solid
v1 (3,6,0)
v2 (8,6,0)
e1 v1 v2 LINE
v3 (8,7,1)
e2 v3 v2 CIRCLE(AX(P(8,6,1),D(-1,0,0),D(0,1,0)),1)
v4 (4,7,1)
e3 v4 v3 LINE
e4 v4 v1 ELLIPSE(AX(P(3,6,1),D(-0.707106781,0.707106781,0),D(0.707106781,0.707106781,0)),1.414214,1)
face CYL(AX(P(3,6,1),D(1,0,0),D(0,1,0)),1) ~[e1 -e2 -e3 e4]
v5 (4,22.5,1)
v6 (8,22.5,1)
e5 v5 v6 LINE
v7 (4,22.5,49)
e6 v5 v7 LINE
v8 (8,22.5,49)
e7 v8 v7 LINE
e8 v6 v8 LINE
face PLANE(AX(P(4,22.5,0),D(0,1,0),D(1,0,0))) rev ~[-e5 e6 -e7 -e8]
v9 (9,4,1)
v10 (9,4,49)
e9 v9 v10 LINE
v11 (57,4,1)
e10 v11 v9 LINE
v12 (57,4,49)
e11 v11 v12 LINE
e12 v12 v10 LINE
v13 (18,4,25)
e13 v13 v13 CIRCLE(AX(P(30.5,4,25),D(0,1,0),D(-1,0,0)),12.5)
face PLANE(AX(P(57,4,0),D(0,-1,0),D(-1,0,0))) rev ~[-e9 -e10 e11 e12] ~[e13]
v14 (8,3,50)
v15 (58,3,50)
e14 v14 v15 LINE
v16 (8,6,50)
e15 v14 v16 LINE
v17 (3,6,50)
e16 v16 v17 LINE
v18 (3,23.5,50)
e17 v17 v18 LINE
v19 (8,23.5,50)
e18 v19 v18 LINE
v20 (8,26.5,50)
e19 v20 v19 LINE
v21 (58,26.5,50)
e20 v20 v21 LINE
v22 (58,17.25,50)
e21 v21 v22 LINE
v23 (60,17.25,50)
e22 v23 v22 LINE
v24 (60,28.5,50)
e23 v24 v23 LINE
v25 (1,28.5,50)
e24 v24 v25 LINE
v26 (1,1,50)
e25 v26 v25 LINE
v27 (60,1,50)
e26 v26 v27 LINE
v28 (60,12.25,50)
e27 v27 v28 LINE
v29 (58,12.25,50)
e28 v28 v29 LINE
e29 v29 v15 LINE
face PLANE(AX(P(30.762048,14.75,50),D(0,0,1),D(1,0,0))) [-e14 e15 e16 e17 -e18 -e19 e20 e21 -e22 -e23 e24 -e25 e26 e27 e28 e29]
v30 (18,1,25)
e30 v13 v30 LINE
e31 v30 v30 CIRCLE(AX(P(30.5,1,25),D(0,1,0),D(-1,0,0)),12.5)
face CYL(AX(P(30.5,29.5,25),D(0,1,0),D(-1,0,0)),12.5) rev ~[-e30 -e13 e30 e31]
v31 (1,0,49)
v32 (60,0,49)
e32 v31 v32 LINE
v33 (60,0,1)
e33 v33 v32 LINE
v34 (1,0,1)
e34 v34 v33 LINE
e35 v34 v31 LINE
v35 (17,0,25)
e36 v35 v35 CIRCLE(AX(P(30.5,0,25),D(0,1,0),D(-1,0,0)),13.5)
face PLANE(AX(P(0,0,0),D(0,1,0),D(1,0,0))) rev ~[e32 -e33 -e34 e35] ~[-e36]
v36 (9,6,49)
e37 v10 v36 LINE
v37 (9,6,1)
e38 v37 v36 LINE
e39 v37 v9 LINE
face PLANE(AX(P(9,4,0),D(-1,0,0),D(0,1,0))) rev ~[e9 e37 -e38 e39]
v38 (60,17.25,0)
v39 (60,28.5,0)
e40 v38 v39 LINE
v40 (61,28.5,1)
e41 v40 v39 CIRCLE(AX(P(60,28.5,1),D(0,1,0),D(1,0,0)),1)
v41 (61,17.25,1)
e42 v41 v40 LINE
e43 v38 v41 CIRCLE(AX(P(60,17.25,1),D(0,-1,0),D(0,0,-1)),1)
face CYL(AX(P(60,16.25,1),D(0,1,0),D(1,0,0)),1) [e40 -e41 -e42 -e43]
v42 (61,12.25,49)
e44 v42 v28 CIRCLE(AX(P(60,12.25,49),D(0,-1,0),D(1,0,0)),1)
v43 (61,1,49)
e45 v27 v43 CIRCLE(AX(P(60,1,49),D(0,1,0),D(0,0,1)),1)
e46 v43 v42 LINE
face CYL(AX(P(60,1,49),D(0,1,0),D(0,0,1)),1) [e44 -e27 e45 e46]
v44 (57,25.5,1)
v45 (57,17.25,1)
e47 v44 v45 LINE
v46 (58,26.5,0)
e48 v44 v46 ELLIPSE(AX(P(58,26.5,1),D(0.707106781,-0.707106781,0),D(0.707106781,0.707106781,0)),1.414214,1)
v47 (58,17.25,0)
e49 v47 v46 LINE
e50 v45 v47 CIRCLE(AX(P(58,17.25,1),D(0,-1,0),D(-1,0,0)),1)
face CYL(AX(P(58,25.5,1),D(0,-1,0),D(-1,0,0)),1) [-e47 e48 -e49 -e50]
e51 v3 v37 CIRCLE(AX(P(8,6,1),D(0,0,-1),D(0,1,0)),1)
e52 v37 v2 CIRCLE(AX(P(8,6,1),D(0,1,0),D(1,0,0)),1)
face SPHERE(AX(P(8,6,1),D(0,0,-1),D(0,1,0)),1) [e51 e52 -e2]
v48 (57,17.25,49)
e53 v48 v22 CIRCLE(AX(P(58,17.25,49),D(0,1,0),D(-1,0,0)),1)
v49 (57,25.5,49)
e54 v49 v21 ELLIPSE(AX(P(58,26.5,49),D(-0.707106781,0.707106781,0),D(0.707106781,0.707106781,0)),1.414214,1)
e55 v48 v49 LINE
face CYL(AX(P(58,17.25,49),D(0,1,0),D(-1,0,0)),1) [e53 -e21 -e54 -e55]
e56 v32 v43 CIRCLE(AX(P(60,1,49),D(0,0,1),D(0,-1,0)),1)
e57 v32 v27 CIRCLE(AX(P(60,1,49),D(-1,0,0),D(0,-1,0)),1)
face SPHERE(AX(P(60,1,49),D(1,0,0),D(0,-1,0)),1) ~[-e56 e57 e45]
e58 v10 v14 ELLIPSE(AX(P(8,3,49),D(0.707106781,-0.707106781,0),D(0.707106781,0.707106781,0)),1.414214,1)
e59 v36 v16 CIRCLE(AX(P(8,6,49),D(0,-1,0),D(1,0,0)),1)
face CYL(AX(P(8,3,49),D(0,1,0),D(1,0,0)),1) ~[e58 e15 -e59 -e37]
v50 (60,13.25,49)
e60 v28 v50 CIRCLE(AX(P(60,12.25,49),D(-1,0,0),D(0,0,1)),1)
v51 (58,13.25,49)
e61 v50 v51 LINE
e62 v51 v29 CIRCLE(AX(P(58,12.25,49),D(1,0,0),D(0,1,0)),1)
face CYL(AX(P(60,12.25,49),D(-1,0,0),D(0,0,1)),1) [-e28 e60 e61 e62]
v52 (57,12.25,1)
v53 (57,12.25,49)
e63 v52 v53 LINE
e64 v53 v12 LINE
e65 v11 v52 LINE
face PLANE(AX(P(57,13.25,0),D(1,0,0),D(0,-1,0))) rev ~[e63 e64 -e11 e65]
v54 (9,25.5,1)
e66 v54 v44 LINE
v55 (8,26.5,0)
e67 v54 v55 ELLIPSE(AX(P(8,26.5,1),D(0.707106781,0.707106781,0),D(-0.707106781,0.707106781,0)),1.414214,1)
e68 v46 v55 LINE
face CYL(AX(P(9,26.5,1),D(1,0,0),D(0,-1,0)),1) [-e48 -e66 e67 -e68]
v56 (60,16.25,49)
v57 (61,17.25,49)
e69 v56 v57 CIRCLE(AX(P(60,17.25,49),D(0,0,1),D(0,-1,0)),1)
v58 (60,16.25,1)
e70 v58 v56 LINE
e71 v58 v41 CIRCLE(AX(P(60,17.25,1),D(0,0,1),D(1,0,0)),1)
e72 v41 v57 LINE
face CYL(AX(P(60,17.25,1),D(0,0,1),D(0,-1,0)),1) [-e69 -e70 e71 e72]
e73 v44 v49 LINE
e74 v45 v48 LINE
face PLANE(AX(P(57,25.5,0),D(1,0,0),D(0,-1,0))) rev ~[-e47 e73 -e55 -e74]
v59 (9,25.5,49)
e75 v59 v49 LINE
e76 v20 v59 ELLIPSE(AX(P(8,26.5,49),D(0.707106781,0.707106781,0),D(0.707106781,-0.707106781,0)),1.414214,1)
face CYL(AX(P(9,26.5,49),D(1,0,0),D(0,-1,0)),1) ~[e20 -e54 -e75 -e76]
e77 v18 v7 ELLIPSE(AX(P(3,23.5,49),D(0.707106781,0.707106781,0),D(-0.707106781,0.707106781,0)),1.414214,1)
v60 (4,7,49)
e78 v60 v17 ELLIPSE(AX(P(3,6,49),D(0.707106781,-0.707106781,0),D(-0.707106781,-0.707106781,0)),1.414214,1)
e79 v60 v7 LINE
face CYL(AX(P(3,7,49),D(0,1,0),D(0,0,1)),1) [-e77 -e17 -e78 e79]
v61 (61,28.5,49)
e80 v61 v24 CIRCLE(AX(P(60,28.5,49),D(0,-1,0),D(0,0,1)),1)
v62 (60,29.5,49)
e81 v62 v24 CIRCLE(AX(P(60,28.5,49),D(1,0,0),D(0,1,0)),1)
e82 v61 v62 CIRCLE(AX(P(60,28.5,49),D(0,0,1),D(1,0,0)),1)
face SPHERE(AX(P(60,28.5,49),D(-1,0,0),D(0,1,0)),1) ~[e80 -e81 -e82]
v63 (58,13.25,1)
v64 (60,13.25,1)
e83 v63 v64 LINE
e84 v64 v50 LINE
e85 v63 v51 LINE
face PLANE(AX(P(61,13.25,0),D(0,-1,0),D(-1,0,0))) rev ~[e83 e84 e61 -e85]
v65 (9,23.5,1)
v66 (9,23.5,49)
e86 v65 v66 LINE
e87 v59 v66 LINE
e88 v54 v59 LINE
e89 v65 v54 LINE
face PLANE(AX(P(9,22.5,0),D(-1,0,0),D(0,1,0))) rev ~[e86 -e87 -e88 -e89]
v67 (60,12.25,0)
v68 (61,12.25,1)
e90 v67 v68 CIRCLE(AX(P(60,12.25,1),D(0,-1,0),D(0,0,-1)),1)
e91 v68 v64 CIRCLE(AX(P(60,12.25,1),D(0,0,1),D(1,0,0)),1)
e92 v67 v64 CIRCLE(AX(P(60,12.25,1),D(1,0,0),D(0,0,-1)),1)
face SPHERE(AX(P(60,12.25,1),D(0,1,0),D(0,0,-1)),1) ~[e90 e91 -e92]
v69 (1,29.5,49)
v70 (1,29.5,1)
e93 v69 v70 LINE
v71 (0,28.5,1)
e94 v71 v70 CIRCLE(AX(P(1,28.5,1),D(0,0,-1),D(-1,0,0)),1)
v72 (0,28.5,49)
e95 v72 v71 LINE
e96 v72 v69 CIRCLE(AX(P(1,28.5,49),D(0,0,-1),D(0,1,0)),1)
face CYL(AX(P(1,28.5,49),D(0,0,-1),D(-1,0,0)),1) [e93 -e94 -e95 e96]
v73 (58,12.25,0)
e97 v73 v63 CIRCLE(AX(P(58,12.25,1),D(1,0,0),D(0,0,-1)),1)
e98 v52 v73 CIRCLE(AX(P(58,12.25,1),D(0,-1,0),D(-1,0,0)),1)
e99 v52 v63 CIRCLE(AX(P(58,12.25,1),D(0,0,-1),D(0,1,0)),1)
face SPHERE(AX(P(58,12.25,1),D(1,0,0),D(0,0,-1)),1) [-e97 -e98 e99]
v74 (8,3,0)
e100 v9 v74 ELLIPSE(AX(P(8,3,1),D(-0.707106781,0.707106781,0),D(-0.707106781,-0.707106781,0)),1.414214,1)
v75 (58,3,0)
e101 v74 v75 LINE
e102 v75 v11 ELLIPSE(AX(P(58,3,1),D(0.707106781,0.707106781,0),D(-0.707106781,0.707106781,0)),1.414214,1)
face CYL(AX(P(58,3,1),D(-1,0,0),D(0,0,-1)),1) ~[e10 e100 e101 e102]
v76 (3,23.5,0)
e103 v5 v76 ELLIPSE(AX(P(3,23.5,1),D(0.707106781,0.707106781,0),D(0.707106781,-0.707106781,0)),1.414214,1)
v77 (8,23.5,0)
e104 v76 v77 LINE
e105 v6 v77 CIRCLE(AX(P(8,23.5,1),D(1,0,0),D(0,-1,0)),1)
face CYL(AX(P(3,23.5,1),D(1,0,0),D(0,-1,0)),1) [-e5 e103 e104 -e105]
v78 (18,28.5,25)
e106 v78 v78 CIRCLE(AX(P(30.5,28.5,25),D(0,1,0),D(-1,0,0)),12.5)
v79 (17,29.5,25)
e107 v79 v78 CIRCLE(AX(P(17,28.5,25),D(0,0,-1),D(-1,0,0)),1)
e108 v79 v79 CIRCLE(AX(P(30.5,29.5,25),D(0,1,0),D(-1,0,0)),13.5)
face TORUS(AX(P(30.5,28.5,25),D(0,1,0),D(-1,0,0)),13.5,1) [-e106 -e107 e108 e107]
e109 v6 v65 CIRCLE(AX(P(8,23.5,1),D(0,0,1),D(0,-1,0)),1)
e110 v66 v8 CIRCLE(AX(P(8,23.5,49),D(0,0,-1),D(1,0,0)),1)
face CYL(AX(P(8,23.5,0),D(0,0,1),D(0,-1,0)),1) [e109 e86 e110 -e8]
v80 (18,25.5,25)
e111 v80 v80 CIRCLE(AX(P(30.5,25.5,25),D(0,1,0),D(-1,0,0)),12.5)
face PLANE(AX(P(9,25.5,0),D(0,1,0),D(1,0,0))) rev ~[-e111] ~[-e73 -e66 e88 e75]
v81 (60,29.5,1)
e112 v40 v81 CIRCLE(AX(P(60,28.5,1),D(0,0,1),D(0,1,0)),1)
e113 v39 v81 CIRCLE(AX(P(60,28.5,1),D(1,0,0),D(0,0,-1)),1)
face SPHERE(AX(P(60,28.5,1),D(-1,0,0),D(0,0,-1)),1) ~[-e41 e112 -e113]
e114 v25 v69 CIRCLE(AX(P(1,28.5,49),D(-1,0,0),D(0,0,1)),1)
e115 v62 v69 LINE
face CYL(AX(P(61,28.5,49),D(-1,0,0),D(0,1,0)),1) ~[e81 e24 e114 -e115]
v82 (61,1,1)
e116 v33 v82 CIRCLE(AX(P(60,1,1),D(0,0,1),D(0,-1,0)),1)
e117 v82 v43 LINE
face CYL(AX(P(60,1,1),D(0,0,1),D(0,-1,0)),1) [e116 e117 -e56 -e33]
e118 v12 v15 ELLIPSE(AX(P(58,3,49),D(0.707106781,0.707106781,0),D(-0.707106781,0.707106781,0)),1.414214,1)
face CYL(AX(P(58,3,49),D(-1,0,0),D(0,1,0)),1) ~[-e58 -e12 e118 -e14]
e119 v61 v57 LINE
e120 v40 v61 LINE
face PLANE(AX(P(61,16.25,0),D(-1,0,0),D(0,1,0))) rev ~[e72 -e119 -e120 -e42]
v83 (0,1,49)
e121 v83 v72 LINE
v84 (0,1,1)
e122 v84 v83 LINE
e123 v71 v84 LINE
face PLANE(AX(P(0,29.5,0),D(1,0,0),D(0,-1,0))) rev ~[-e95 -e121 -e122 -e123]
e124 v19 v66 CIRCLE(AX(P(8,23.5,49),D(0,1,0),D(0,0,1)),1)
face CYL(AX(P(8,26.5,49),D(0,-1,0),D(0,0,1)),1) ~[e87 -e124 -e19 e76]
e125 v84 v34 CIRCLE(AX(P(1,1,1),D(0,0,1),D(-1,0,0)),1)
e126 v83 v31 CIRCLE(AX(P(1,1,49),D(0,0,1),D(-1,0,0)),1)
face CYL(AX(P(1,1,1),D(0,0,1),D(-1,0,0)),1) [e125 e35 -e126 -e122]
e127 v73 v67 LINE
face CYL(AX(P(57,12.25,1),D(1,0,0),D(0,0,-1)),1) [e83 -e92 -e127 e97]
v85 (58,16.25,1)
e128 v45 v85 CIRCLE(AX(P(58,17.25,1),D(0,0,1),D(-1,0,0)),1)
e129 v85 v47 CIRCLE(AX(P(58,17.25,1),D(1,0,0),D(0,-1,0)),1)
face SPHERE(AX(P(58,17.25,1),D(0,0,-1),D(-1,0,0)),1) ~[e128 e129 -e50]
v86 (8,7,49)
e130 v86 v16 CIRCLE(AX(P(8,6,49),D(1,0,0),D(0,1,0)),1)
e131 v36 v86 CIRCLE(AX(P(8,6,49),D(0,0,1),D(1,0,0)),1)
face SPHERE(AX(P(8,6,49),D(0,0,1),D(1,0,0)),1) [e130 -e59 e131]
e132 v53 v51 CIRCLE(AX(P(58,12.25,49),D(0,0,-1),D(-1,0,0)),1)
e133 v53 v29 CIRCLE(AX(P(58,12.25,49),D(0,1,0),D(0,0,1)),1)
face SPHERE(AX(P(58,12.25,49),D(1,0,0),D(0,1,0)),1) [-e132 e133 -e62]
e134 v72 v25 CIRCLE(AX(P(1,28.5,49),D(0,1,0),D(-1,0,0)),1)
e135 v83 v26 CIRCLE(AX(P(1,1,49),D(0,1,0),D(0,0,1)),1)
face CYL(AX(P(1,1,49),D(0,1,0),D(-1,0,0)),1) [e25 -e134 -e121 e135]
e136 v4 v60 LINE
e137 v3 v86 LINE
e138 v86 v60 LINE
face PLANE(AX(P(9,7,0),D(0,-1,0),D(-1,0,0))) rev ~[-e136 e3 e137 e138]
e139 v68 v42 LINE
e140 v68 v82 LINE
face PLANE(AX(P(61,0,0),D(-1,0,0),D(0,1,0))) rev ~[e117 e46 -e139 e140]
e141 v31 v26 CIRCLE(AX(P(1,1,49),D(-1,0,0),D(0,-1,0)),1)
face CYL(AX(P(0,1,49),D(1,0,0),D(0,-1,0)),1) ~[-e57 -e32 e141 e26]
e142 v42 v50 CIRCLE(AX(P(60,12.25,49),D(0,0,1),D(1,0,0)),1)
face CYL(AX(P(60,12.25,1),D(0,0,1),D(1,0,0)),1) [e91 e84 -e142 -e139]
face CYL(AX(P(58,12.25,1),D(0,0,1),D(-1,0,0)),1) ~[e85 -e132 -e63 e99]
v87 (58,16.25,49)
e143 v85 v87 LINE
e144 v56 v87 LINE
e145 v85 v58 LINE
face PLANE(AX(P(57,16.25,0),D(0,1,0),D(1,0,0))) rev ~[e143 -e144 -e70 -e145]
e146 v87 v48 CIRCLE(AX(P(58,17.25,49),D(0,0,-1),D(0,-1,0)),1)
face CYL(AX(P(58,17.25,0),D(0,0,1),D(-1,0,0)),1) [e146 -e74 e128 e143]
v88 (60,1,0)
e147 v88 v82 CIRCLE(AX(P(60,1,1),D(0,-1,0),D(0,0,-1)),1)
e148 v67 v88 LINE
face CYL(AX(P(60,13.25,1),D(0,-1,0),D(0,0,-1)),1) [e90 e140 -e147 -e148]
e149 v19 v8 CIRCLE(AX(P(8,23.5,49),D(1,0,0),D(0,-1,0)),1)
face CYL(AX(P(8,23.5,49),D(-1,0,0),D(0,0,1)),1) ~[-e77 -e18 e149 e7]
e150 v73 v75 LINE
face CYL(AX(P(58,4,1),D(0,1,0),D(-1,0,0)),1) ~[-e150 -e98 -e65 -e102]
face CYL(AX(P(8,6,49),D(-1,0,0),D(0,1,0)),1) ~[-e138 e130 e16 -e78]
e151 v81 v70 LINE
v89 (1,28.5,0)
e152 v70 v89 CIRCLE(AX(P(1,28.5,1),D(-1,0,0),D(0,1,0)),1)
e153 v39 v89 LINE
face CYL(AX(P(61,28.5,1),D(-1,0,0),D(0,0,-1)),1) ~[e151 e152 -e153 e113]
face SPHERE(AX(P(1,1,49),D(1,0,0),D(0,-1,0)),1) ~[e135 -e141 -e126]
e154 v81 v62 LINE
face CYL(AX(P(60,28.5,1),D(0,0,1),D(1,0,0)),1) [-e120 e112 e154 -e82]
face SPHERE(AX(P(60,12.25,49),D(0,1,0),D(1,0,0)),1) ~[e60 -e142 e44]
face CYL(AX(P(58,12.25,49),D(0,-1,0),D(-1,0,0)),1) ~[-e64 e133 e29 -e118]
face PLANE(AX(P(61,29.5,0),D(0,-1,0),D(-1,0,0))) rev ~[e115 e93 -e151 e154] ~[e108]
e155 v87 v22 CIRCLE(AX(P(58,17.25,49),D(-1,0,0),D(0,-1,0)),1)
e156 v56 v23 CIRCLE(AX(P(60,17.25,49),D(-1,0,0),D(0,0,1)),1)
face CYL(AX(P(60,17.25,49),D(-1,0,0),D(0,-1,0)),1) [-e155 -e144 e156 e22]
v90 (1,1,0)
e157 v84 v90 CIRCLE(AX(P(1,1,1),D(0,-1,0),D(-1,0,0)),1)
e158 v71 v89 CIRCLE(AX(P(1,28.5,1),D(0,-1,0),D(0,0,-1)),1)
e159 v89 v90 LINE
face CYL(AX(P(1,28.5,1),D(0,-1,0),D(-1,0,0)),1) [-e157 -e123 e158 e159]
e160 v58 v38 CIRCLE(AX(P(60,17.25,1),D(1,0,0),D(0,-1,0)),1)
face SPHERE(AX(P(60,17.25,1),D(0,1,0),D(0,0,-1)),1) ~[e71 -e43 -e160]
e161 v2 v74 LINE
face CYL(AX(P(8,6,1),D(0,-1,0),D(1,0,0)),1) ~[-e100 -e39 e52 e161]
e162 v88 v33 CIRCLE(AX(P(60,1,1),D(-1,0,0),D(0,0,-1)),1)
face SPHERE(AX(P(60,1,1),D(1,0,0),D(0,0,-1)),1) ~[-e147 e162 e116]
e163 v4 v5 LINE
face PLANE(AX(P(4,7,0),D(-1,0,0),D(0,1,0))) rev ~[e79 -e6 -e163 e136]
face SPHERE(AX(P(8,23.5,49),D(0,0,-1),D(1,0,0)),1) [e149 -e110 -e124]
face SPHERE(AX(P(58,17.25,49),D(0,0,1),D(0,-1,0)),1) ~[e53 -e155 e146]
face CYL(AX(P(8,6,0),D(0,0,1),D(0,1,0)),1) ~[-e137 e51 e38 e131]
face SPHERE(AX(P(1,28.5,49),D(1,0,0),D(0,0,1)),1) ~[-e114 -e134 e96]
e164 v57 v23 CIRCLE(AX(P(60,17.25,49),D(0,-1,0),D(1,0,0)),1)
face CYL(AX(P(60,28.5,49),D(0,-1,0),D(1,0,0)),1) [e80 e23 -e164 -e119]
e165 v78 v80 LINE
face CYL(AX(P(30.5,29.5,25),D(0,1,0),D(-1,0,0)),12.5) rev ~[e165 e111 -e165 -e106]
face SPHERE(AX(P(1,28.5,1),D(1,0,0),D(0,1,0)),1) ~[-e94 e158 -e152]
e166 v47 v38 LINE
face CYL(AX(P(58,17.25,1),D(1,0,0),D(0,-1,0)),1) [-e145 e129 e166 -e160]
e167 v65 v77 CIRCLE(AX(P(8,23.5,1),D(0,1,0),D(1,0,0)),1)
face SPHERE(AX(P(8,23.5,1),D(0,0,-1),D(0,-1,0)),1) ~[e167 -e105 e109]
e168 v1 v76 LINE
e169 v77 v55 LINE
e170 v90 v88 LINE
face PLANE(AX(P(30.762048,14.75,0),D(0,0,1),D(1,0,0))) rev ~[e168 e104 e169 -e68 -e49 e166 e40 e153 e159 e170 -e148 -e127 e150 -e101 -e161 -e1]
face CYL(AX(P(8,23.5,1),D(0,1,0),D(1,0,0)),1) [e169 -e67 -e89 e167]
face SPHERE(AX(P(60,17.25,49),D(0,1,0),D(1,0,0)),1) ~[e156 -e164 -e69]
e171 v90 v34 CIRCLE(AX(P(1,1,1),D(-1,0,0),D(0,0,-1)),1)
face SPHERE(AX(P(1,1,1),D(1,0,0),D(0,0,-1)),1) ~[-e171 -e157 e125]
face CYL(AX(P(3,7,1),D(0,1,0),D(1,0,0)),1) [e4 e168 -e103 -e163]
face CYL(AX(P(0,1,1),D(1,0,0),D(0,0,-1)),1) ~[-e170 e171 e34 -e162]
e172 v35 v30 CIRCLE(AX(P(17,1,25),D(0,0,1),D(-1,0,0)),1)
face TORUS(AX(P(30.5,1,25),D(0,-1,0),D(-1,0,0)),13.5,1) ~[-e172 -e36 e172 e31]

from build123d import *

# Parameters (mm, degrees)
F1_DEPTH = 50
F2_R     = 12.5
F3_DEPTH = 29.501
F6_F1_R  = 1
F6_F2_R  = 1
F6_F3_R  = 1
F6_F4_R  = 1
F6_F5_R  = 1
F6_F6_R  = 1
F6_F7_R  = 1
F6_F8_R  = 1
F6_F9_R  = 1
F6_F10_R = 1
F6_F11_R = 1
F6_F12_R = 1
F6_F13_R = 1
F6_F14_R = 1
F6_F15_R = 1
F6_F16_R = 1
F6_F17_R = 1
F6_F18_R = 1
F6_F19_R = 1
F6_F20_R = 1
F6_F21_R = 1
F6_F22_R = 1
F6_F23_R = 1
F6_F24_R = 1
F6_F25_R = 1


# Not quite as in the source:
# - a feature of the source that left no trace in its solid (it failed there, or was rolled back) is left out


with BuildPart() as f1:
    # F0 (on Top) → F1 (new body)
    with BuildSketch(Plane.XY):
        Polygon((0, 0), (61, 0), (61, 13.25), (57, 13.25), (57, 4), (9, 4), (9, 7), (4, 7), (4, 22.5), (9, 22.5), (9, 25.5), (57, 25.5), (57, 16.25), (61, 16.25), (61, 29.5), (0, 29.5), align=None)
    extrude(amount=F1_DEPTH)

    # F2 (on face) → F3 (cut, through all)
    with BuildSketch(Plane(origin=(0, 29.5, 0), x_dir=(-1, 0, 0), z_dir=(0, 1, 0))):
        with Locations((-30.5, 25)):
            Circle(F2_R)
    extrude(amount=-F3_DEPTH, mode=Mode.SUBTRACT)

    # F6: fillet of radius 1 on 36 edges, made by hand

    # F6_f1
    f6_f1_edges = [f1.edges().sort_by_distance(p)[0] for p in [
        (43, 0, 25),
    ]]
    fillet(f6_f1_edges, radius=F6_F1_R)

    # F6_f2
    f6_f2_edges = [f1.edges().sort_by_distance(p)[0] for p in [
        (43, 29.5, 25),
    ]]
    fillet(f6_f2_edges, radius=F6_F2_R)

    # F6_f3
    f6_f3_edges = [f1.edges().sort_by_distance(p)[0] for p in [
        (30.5, 0, 0),
    ]]
    fillet(f6_f3_edges, radius=F6_F3_R)

    # F6_f4
    f6_f4_edges = [f1.edges().sort_by_distance(p)[0] for p in [
        (30.5, 0, 50),
    ]]
    fillet(f6_f4_edges, radius=F6_F4_R)

    # F6_f5
    f6_f5_edges = [f1.edges().sort_by_distance(p)[0] for p in [
        (30.5, 29.5, 0),
    ]]
    fillet(f6_f5_edges, radius=F6_F5_R)

    # F6_f6
    f6_f6_edges = [f1.edges().sort_by_distance(p)[0] for p in [
        (30.5, 29.5, 50),
    ]]
    fillet(f6_f6_edges, radius=F6_F6_R)

    # F6_f7
    f6_f7_edges = [f1.edges().sort_by_distance(p)[0] for p in [
        (0, 0, 25),
    ]]
    fillet(f6_f7_edges, radius=F6_F7_R)

    # F6_f8
    f6_f8_edges = [f1.edges().sort_by_distance(p)[0] for p in [
        (61, 0, 25),
    ]]
    fillet(f6_f8_edges, radius=F6_F8_R)

    # F6_f9
    f6_f9_edges = [f1.edges().sort_by_distance(p)[0] for p in [
        (61, 13.25, 25),
    ]]
    fillet(f6_f9_edges, radius=F6_F9_R)

    # F6_f10
    f6_f10_edges = [f1.edges().sort_by_distance(p)[0] for p in [
        (61, 29.5, 25),
    ]]
    fillet(f6_f10_edges, radius=F6_F10_R)

    # F6_f11
    f6_f11_edges = [f1.edges().sort_by_distance(p)[0] for p in [
        (57, 13.25, 25),
    ]]
    fillet(f6_f11_edges, radius=F6_F11_R)

    # F6_f12
    f6_f12_edges = [f1.edges().sort_by_distance(p)[0] for p in [
        (9, 7, 25),
    ]]
    fillet(f6_f12_edges, radius=F6_F12_R)

    # F6_f13
    f6_f13_edges = [f1.edges().sort_by_distance(p)[0] for p in [
        (9, 22.5, 25),
    ]]
    fillet(f6_f13_edges, radius=F6_F13_R)

    # F6_f14
    f6_f14_edges = [f1.edges().sort_by_distance(p)[0] for p in [
        (57, 16.25, 25),
    ]]
    fillet(f6_f14_edges, radius=F6_F14_R)

    # F6_f15
    f6_f15_edges = [f1.edges().sort_by_distance(p)[0] for p in [
        (61, 16.25, 25),
    ]]
    fillet(f6_f15_edges, radius=F6_F15_R)

    # F6_f16
    f6_f16_edges = [f1.edges().sort_by_distance(p)[0] for p in [
        (33, 4, 0),
    ]]
    fillet(f6_f16_edges, radius=F6_F16_R)

    # F6_f17
    f6_f17_edges = [f1.edges().sort_by_distance(p)[0] for p in [
        (33, 25.5, 0),
    ]]
    fillet(f6_f17_edges, radius=F6_F17_R)

    # F6_f18
    f6_f18_edges = [f1.edges().sort_by_distance(p)[0] for p in [
        (33, 4, 50),
    ]]
    fillet(f6_f18_edges, radius=F6_F18_R)

    # F6_f19
    f6_f19_edges = [f1.edges().sort_by_distance(p)[0] for p in [
        (33, 25.5, 50),
    ]]
    fillet(f6_f19_edges, radius=F6_F19_R)

    # F6_f20
    f6_f20_edges = [f1.edges().sort_by_distance(p)[0] for p in [
        (4, 14.75, 0),
    ]]
    fillet(f6_f20_edges, radius=F6_F20_R)

    # F6_f21
    f6_f21_edges = [f1.edges().sort_by_distance(p)[0] for p in [
        (4, 14.75, 50),
    ]]
    fillet(f6_f21_edges, radius=F6_F21_R)

    # F6_f22
    f6_f22_edges = [f1.edges().sort_by_distance(p)[0] for p in [
        (6, 7, 0),
    ]]
    fillet(f6_f22_edges, radius=F6_F22_R)

    # F6_f23
    f6_f23_edges = [f1.edges().sort_by_distance(p)[0] for p in [
        (6, 22.5, 0),
    ]]
    fillet(f6_f23_edges, radius=F6_F23_R)

    # F6_f24
    f6_f24_edges = [f1.edges().sort_by_distance(p)[0] for p in [
        (6, 7, 50),
    ]]
    fillet(f6_f24_edges, radius=F6_F24_R)

    # F6_f25
    f6_f25_edges = [f1.edges().sort_by_distance(p)[0] for p in [
        (6, 22.5, 50),
    ]]
    fillet(f6_f25_edges, radius=F6_F25_R)


solid = f1.part
